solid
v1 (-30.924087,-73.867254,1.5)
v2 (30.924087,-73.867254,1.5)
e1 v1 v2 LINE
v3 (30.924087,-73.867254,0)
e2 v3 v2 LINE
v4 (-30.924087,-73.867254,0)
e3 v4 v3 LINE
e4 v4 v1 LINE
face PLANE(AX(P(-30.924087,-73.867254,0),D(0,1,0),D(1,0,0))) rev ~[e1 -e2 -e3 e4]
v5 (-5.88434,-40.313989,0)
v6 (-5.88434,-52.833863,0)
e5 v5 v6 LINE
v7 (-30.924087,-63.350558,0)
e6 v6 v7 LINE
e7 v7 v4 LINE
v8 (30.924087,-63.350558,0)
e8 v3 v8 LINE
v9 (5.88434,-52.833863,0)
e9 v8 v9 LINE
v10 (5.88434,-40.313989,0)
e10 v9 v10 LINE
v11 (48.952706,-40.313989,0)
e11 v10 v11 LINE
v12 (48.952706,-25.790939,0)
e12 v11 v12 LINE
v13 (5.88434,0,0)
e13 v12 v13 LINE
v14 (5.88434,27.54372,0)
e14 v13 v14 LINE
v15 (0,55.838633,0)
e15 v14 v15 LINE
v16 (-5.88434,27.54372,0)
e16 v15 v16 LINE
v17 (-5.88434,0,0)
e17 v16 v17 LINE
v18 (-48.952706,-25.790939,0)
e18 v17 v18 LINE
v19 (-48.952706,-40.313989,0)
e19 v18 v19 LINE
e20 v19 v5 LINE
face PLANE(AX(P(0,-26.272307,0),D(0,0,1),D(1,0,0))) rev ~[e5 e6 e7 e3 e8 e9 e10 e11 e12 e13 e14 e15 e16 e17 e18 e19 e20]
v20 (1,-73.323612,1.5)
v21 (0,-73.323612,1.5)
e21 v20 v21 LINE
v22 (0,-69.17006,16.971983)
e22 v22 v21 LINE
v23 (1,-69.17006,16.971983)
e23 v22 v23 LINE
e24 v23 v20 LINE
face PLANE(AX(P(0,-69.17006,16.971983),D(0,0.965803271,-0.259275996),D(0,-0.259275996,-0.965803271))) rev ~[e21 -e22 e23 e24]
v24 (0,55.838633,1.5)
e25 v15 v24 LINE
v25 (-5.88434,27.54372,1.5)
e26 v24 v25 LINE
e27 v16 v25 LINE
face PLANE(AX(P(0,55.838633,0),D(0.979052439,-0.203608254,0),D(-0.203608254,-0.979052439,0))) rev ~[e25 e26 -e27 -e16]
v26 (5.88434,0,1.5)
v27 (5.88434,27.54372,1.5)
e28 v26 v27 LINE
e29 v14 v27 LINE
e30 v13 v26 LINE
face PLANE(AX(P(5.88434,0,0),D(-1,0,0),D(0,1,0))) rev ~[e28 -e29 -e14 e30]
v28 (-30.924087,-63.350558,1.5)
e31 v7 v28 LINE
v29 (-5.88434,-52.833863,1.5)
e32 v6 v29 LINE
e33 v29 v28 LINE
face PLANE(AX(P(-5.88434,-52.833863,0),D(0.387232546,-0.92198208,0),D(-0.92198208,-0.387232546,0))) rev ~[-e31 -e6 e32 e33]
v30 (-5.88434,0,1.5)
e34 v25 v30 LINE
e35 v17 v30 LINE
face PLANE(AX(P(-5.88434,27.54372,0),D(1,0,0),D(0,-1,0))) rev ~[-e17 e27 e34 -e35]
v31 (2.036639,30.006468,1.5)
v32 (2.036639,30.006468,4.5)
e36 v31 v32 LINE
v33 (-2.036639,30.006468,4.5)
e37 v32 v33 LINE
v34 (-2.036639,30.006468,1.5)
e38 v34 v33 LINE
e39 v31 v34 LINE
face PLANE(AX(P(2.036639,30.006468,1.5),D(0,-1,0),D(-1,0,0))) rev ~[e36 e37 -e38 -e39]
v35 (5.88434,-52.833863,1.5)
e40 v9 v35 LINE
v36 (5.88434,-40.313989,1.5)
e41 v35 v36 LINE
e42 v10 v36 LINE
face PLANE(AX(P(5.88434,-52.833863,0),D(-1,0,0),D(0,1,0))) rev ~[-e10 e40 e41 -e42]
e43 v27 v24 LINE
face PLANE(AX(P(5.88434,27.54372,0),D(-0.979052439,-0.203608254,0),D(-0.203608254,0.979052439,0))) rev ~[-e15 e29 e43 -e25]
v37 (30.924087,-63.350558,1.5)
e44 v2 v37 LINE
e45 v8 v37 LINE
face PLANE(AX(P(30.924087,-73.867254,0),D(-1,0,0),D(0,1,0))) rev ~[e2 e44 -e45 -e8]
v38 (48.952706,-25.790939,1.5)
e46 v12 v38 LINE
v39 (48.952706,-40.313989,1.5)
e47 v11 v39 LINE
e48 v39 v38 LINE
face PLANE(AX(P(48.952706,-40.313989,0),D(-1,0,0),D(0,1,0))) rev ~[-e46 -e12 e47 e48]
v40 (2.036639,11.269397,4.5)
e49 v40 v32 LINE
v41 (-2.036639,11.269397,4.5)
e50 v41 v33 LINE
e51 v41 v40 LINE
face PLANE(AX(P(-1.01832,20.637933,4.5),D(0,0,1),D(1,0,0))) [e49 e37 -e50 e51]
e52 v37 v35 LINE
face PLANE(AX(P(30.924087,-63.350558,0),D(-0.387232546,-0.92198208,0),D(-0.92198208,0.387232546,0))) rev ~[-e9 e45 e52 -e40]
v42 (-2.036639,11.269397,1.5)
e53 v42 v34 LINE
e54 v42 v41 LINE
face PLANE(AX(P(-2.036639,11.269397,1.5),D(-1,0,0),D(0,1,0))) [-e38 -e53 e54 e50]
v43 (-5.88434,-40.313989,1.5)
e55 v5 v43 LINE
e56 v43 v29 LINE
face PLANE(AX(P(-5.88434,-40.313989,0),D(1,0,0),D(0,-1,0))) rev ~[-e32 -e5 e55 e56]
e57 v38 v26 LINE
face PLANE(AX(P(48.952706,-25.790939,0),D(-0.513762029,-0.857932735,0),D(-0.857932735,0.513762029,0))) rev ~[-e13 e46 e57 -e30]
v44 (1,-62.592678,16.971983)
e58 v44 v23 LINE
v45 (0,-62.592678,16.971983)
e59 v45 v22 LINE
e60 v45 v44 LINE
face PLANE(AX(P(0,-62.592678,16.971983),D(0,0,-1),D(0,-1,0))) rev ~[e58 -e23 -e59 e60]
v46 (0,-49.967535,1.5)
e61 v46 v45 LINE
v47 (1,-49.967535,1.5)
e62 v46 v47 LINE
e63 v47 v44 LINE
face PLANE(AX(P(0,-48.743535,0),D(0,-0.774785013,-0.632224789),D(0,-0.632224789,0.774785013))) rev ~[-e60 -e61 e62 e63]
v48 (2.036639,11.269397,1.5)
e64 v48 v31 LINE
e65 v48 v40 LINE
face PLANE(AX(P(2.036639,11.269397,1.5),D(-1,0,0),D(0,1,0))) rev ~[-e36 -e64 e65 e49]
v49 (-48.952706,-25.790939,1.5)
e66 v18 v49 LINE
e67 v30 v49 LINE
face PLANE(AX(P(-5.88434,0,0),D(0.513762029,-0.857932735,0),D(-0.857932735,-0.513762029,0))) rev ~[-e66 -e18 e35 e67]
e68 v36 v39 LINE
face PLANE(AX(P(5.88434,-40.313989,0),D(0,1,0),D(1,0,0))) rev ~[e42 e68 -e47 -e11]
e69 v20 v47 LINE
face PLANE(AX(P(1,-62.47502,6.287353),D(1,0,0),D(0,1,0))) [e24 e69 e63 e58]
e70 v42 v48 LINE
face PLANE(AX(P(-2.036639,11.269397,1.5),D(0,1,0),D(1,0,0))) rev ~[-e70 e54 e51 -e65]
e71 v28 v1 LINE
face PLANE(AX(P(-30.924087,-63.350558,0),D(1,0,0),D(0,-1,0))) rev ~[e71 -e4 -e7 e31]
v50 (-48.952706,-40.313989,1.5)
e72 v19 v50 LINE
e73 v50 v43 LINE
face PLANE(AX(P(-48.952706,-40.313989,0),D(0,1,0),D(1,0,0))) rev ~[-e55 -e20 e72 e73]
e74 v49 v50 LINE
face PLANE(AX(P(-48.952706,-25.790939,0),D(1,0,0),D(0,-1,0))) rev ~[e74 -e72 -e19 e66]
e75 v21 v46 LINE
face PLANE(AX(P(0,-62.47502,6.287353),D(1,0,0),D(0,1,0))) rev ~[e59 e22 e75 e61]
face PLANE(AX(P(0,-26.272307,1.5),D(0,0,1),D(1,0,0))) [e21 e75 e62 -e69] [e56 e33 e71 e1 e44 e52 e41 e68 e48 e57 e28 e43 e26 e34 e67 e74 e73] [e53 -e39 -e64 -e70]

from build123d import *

# Parameters (mm, degrees)
F1_DEPTH = 1.5
F2_W     = 2.0366392564
F2_H     = 18.7370711938
F3_DEPTH = 3
F5_DEPTH = 1


# Not quite as in the source:
# - a feature names something its author has since deleted; it is built from what else it names


with BuildPart() as f1:
    # F0 (on Top) → F1 (new body)
    with BuildSketch(Plane.XY):
        Polygon((5.8843404986, 27.5437198579), (0, 55.8386333287), (-5.8843404986, 27.5437198579), (-5.8843404986, 0), (-48.9527061582, -25.7909391075), (-48.9527061582, -40.313988924), (-5.8843404986, -40.313988924), (-5.8843404986, -52.8338626027), (-30.9240873903, -63.3505582809), (-30.9240873903, -73.8672539592), (0, -73.8672539592), (30.9240873903, -73.8672539592), (30.9240873903, -63.3505582809), (5.8843404986, -52.8338626027), (5.8843404986, -40.313988924), (48.9527061582, -40.313988924), (48.9527061582, -25.7909391075), (5.8843404986, 0), align=None)
    extrude(amount=F1_DEPTH)

    # F2 (on face) → F3 (join)
    with BuildSketch(Plane.XY.offset(1.5)):
        with Locations((-1.0183196282, 20.6379326992)):
            Rectangle(F2_W, F2_H)
        with Locations((1.0183196282, 20.6379326992)):
            Rectangle(F2_W, F2_H)
    extrude(amount=F3_DEPTH)

    # F4 (on Right) → F5 (join)
    with BuildSketch(Plane.YZ):
        Polygon((-69.1700602547, 16.9719830155), (-73.7262964249, 0), (-48.7435348332, 0), (-62.592677772, 16.9719830155), align=None)
    extrude(amount=F5_DEPTH)


solid = f1.part
